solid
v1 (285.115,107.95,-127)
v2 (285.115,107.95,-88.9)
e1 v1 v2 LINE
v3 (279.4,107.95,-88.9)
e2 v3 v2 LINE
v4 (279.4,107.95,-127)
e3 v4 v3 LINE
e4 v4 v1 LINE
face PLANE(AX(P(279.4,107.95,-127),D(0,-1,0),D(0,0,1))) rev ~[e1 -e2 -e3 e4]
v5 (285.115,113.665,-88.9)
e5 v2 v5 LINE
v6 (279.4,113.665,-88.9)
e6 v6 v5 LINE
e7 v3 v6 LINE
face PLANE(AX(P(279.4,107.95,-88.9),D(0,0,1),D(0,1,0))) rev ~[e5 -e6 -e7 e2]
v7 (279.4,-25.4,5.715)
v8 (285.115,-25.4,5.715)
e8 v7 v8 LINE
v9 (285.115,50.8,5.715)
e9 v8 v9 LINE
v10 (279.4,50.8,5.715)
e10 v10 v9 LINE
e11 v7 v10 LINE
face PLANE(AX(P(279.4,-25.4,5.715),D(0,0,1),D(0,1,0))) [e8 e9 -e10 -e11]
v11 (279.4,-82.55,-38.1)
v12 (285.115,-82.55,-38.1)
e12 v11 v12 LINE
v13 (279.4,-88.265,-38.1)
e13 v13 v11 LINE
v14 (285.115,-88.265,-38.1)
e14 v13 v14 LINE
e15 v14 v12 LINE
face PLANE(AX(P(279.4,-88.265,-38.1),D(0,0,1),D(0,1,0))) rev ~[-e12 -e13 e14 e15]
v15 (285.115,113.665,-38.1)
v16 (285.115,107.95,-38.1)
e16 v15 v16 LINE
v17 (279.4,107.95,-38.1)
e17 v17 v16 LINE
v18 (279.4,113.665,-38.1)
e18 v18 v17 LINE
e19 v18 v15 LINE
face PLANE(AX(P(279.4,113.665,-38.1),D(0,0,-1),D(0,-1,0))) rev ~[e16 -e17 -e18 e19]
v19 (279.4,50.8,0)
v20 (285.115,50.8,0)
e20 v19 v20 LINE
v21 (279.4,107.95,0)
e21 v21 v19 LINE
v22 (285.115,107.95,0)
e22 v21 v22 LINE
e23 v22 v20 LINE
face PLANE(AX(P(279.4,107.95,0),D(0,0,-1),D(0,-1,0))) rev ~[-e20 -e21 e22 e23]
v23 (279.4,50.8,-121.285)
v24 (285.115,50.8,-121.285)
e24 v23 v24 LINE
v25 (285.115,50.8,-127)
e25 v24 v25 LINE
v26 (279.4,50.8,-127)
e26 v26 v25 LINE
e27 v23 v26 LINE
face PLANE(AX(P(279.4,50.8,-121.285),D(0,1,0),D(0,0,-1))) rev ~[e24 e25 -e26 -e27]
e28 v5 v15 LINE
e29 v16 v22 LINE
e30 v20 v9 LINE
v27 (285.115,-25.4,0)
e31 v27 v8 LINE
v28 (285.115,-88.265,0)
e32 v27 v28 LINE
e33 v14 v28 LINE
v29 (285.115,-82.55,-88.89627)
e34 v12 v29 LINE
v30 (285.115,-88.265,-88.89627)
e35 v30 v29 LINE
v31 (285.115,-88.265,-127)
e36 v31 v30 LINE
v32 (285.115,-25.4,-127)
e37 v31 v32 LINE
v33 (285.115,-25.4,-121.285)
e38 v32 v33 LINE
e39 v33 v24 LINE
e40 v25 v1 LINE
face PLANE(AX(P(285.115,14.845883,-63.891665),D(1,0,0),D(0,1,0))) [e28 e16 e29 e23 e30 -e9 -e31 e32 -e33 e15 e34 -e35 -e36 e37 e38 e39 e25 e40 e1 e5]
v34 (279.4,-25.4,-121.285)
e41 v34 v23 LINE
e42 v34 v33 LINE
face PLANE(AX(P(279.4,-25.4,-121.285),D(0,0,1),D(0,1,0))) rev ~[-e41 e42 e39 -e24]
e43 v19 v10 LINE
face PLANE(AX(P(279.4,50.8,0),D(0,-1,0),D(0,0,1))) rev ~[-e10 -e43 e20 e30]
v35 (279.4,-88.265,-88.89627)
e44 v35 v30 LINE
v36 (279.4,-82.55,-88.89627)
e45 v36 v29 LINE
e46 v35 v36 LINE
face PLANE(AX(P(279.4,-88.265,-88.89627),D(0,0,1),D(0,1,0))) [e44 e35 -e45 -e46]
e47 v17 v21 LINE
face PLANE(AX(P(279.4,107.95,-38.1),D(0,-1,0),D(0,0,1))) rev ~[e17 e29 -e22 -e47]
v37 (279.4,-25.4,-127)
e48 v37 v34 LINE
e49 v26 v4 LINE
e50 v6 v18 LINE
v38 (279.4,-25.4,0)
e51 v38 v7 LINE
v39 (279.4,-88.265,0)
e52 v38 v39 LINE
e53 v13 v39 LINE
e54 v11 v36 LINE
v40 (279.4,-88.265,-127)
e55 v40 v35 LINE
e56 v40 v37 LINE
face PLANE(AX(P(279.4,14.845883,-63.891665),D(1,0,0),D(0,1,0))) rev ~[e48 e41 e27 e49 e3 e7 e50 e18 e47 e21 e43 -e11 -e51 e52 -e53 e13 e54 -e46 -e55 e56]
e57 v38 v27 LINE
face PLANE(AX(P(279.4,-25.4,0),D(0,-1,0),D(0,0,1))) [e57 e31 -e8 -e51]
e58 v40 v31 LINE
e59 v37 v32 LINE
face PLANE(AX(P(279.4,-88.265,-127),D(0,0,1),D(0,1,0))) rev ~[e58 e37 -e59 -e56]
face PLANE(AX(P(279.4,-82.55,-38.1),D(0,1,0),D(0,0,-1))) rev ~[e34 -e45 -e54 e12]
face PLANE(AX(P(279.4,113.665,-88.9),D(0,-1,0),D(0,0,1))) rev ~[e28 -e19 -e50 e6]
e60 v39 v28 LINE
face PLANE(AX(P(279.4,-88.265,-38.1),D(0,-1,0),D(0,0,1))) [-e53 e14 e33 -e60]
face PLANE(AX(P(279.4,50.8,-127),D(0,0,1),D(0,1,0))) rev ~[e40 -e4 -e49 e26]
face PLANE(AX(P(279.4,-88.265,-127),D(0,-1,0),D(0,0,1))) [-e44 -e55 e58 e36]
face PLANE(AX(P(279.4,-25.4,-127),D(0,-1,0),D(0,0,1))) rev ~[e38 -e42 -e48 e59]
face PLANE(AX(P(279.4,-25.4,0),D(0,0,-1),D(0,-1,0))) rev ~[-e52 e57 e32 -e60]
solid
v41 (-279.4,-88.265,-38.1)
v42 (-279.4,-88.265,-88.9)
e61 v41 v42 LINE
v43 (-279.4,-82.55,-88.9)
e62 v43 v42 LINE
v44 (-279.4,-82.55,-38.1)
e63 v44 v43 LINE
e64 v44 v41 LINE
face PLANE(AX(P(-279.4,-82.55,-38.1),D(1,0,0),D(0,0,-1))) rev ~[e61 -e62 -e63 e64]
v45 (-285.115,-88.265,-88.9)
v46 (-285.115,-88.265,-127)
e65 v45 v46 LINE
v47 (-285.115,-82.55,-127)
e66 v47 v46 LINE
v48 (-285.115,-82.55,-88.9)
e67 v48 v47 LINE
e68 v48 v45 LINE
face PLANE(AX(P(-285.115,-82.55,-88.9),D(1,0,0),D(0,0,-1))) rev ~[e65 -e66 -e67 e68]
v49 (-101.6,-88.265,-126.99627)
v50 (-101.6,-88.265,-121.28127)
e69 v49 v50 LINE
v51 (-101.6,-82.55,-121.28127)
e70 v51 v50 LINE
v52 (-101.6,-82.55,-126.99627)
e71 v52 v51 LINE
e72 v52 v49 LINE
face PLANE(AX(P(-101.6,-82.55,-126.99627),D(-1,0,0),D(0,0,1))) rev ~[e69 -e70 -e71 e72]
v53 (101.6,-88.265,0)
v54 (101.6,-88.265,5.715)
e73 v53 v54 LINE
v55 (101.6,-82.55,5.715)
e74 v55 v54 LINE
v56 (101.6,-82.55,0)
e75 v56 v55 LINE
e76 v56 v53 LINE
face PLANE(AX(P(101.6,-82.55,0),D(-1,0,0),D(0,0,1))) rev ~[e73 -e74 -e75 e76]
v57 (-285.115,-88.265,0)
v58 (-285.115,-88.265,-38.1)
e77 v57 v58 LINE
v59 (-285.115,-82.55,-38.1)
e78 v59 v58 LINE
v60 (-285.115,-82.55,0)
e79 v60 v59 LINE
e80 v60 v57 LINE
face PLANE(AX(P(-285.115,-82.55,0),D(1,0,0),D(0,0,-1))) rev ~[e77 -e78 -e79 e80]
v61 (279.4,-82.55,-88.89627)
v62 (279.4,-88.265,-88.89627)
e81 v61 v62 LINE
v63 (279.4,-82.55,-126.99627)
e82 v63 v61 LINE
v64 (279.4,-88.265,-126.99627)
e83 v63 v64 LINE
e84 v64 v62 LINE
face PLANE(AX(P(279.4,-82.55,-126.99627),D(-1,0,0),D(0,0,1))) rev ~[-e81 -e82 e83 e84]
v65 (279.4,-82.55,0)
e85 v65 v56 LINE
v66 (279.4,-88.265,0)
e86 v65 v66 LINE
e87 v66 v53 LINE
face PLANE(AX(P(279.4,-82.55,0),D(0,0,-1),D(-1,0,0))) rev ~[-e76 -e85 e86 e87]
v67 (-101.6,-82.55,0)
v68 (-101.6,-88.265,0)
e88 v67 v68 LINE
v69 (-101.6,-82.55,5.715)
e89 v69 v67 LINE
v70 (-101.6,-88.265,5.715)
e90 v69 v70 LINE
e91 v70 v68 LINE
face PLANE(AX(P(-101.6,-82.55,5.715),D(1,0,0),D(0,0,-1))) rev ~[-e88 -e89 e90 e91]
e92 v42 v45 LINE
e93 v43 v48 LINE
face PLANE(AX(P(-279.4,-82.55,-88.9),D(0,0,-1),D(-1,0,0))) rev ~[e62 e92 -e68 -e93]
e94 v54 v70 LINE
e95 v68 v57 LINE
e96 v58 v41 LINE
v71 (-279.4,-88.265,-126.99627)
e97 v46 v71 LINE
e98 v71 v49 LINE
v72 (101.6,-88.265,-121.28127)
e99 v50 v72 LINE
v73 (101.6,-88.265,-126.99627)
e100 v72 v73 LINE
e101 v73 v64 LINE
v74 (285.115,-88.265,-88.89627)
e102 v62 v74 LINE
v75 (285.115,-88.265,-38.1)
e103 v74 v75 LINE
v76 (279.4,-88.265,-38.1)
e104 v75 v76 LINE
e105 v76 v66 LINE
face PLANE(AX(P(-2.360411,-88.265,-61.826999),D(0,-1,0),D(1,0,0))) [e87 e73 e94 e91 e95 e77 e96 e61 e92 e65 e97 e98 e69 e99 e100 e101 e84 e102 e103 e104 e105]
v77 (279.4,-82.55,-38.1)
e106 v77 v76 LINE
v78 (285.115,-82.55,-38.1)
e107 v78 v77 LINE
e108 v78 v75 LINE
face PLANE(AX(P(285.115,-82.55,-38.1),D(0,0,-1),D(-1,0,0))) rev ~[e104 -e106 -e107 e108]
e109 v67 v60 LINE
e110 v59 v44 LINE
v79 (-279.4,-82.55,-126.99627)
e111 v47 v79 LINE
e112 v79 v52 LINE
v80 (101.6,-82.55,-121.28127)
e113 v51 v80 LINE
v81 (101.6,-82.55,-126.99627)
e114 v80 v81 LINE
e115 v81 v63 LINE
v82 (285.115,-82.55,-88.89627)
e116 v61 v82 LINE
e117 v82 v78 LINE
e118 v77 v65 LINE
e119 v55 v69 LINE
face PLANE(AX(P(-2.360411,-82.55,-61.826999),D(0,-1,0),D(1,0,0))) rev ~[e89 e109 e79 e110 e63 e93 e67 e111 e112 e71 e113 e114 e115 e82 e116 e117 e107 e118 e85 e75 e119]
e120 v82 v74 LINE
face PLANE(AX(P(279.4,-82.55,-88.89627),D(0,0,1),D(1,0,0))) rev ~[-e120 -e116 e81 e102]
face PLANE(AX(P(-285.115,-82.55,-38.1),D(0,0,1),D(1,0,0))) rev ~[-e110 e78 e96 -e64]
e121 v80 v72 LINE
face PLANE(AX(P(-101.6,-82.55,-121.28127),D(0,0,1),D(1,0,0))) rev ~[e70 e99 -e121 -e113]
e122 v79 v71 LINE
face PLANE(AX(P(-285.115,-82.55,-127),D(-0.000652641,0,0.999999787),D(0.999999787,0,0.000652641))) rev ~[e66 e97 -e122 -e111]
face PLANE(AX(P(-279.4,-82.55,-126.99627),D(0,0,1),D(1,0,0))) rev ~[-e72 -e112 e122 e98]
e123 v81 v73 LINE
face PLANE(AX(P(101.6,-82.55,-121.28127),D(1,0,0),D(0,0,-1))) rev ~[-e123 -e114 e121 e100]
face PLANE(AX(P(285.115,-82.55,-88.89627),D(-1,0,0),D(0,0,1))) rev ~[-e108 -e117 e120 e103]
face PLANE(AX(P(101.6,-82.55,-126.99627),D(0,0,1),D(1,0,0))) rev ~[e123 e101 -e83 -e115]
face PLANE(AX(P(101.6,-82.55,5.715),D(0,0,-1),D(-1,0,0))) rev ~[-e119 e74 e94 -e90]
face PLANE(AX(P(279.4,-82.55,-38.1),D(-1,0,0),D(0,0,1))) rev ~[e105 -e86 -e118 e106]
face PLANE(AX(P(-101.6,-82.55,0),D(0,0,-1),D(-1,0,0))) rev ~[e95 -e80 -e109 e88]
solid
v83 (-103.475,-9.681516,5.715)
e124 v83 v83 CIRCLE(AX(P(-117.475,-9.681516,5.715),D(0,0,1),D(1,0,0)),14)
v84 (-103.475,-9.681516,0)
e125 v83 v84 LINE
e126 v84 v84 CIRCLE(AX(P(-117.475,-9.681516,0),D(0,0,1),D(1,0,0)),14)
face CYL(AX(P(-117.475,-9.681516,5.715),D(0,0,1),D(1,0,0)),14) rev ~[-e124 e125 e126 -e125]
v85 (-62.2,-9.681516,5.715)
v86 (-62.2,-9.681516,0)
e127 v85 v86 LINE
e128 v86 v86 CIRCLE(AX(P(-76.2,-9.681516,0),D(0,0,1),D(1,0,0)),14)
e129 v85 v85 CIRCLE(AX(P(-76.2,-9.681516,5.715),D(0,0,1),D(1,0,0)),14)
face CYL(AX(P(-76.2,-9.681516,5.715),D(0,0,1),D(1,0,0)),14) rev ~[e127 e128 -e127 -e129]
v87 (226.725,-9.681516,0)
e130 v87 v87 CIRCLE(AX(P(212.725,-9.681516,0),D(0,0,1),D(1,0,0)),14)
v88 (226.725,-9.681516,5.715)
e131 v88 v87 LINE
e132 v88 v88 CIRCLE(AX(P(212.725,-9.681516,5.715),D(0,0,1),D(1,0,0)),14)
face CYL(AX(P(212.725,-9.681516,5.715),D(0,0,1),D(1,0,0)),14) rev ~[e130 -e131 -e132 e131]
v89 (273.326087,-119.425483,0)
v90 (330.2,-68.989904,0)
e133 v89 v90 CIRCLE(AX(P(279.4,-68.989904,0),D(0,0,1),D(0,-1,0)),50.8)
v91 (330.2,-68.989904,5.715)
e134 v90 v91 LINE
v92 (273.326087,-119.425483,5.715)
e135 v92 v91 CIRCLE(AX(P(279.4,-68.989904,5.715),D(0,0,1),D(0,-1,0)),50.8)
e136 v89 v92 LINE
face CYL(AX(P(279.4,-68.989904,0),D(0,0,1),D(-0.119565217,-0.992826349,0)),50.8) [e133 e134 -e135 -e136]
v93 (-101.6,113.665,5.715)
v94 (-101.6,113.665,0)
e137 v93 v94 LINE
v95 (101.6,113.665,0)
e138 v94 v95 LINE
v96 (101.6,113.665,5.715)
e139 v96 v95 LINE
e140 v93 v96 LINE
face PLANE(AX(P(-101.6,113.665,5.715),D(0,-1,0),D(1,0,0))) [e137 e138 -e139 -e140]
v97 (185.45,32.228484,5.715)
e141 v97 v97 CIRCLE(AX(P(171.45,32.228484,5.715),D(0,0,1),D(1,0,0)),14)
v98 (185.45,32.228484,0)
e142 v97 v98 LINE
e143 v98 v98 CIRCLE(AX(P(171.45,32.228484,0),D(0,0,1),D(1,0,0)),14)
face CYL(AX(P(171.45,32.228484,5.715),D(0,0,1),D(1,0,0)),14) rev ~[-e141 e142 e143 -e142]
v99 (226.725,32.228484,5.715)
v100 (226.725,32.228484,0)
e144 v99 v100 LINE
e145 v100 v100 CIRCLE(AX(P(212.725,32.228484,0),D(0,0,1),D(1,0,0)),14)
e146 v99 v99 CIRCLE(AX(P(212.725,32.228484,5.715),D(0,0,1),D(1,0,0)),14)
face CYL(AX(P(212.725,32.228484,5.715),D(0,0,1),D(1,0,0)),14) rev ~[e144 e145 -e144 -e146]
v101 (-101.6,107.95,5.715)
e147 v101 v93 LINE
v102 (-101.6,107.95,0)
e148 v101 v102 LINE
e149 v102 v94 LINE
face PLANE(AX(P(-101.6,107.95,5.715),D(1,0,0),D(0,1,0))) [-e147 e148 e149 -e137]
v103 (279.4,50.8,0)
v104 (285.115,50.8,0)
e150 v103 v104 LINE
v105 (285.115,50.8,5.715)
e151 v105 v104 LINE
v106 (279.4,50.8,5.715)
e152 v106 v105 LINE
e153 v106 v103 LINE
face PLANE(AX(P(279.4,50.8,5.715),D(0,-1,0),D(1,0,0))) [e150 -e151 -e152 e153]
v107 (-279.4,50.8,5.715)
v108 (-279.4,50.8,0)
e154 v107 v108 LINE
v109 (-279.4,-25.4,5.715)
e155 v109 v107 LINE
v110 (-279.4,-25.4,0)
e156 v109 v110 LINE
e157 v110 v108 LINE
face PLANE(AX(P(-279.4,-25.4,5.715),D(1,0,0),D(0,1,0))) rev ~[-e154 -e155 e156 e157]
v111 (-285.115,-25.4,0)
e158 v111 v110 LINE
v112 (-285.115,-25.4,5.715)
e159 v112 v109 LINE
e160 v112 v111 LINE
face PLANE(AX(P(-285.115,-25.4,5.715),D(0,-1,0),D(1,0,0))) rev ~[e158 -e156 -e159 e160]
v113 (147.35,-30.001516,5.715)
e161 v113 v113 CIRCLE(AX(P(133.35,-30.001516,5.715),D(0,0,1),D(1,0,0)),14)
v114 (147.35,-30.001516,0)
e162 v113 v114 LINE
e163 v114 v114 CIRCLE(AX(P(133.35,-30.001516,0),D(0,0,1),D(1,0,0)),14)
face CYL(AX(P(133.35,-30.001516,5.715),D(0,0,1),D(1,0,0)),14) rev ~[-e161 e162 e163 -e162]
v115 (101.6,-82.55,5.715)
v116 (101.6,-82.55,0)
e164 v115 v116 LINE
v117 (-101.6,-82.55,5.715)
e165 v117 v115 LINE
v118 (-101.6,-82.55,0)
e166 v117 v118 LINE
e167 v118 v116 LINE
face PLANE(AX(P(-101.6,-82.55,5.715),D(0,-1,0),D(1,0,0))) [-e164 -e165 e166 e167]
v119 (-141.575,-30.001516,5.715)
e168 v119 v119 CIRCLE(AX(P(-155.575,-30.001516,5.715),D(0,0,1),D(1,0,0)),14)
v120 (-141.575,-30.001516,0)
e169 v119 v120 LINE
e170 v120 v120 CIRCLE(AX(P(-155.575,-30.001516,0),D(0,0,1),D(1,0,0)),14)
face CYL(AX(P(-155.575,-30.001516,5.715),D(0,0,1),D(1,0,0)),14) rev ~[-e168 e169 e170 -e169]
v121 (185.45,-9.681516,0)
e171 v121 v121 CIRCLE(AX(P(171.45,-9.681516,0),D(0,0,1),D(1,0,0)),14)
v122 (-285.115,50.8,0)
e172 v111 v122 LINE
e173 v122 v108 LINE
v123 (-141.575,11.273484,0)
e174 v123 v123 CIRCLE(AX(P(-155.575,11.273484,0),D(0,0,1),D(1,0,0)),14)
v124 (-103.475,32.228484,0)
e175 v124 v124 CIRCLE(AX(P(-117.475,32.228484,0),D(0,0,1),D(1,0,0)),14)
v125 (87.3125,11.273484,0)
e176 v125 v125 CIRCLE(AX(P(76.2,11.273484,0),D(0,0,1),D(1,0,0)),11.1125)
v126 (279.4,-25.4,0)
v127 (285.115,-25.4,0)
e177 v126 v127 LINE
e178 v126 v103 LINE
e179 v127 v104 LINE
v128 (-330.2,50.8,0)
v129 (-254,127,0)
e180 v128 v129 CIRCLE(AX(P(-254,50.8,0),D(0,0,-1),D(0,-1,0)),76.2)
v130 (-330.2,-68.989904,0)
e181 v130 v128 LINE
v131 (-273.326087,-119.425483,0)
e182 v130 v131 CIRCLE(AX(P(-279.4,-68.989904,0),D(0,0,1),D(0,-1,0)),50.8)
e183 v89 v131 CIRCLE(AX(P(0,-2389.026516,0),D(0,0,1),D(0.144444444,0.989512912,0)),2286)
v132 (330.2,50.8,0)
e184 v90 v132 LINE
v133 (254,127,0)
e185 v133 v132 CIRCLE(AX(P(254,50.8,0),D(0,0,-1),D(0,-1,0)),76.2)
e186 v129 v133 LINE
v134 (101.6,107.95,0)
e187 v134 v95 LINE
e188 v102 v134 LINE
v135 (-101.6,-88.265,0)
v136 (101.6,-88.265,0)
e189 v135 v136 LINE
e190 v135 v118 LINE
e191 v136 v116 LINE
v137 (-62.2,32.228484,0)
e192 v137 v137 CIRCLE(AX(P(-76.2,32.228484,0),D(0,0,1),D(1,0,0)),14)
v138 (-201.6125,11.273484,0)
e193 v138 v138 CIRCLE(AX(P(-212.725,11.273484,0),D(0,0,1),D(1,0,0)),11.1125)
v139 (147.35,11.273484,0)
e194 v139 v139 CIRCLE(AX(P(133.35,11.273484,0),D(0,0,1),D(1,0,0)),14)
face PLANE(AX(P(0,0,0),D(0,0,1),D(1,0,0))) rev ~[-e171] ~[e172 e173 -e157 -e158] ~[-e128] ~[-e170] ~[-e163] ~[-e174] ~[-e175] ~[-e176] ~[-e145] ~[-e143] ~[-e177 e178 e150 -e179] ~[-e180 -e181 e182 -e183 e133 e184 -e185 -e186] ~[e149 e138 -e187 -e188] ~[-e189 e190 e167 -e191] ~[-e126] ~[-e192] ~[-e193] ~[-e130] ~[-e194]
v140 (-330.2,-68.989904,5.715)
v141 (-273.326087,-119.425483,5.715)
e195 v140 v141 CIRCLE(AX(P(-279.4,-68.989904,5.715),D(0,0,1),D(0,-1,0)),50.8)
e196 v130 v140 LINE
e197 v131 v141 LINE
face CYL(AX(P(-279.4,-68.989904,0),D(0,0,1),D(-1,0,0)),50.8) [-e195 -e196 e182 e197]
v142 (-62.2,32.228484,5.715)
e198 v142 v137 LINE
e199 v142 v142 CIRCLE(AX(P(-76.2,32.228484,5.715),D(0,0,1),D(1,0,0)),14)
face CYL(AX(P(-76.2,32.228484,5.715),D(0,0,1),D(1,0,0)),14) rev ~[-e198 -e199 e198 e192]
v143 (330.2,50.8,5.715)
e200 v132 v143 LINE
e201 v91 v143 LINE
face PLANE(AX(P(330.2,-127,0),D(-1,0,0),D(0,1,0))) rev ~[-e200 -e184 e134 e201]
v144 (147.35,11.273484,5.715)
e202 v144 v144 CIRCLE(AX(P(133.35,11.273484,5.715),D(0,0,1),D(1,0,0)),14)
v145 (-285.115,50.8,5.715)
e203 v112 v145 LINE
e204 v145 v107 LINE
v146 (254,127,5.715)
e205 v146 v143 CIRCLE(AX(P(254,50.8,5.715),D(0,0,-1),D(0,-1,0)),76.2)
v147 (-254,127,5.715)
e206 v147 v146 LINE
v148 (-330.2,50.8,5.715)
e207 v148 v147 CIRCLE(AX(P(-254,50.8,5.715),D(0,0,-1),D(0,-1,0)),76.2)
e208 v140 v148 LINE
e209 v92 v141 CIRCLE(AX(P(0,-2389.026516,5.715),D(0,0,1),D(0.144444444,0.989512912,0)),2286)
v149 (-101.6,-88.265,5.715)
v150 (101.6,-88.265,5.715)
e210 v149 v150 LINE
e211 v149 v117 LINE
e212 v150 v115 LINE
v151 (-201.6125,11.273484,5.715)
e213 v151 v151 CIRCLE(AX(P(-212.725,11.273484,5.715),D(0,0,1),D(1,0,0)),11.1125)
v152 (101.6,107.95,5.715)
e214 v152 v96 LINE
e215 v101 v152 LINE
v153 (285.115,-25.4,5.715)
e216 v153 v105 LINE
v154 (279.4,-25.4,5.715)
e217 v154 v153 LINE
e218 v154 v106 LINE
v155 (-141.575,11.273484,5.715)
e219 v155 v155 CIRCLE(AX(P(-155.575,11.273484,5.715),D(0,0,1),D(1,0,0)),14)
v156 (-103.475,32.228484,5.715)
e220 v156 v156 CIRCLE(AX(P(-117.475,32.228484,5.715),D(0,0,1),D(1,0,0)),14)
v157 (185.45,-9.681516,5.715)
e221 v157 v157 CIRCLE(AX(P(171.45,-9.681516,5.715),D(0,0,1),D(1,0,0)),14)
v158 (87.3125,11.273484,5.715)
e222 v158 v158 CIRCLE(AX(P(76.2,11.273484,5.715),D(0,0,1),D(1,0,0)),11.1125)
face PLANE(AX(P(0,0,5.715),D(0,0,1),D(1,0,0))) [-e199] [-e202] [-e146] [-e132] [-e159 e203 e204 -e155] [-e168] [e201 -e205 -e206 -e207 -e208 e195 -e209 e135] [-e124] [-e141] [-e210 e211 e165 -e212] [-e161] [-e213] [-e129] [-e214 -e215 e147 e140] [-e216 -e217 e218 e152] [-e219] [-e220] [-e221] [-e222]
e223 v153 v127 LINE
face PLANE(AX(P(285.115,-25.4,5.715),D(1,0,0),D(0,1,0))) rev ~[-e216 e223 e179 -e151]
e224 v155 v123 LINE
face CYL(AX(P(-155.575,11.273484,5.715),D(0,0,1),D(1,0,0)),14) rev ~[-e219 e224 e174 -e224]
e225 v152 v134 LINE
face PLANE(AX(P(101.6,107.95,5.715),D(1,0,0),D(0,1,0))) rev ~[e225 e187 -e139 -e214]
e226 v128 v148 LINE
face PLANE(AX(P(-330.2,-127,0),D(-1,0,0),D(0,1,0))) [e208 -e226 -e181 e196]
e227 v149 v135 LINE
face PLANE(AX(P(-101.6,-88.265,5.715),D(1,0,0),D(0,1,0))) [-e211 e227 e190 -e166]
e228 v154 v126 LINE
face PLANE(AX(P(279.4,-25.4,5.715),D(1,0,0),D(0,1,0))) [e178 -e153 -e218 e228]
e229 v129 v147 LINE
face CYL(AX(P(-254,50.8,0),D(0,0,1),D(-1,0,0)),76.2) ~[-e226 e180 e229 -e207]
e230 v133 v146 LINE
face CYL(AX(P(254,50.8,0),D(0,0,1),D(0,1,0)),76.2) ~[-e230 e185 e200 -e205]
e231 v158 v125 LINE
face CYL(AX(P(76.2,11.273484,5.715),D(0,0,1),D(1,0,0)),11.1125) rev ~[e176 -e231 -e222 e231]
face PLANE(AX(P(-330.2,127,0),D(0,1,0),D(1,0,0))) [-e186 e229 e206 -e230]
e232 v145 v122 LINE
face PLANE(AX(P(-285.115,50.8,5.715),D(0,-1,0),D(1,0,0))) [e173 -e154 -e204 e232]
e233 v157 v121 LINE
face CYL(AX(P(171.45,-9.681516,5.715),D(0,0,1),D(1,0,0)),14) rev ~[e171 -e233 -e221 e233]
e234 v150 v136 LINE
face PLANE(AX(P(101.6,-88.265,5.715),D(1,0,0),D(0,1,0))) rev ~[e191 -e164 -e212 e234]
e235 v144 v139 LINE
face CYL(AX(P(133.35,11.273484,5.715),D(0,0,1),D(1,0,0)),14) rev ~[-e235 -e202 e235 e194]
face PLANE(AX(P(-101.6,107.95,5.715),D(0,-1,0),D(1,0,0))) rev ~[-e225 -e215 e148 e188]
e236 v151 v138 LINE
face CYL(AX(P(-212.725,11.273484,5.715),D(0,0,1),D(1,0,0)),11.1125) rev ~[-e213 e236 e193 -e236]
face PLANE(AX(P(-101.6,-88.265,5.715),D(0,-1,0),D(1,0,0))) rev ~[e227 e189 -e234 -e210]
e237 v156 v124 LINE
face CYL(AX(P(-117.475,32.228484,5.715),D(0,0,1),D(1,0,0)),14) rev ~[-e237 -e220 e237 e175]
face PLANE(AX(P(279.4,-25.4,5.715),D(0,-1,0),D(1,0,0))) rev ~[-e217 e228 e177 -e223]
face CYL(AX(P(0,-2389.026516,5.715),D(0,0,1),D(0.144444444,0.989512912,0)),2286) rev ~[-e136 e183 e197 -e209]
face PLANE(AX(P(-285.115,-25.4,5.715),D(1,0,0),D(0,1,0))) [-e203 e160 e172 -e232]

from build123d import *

# Parameters (mm, degrees)
F0_W      = 660.4
F0_H      = 254
F1_DEPTH  = 5.715
F3_DEPTH  = 5.716
F5_R      = 50.8
F6_R      = 11.1125
F6_R_2    = 14
F7_DEPTH  = 5.716
F8_R      = 76.2
F12_DEPTH = 5.715
F14_W     = 5.715
F14_H     = 38.1037298436
F14_W_2   = 76.2
F14_H_2   = 5.715
F14_H_3   = 38.1
F15_DEPTH = 5.715
F16_W     = 203.2
F16_H     = 5.715
F16_W_2   = 5.715
F16_H_2   = 76.2
F17_DEPTH = 25.4


with BuildPart() as f1:
    # F0 (on Top) → F1 (new body)
    with BuildSketch(Plane.XY):
        Rectangle(F0_W, F0_H)
    extrude(amount=F1_DEPTH)

    # F2 (on face) → F3 (cut, through all)
    with BuildSketch(Plane.XY.offset(5.715)):
        with BuildLine():
            Line((-330.2, -127), (330.2, -127))
            ThreePointArc((330.2, -127), (0, -103.0265162018), (-330.2, -127))
        make_face()
    extrude(amount=-F3_DEPTH, mode=Mode.SUBTRACT)

    # F5
    f5_edges = [f1.edges().sort_by_distance(p)[0] for p in [
        (-330.2, -127, 2.8575),
        (330.2, -127, 2.8575),
    ]]
    fillet(f5_edges, radius=F5_R)

    # F6 (on face) → F7 (cut, through all)
    with BuildSketch(Plane.XY.offset(5.715)):
        with Locations((-212.725, 11.2734837982)):
            Circle(F6_R)
        with Locations((76.2, 11.2734837982)):
            Circle(F6_R)
        with Locations((-117.475, 32.2284837982)):
            Circle(F6_R_2)
        with Locations((-117.475, -9.6815162018)):
            Circle(F6_R_2)
        with Locations((-155.575, 11.2734837982)):
            Circle(F6_R_2)
        with Locations((-155.575, -30.0015162018)):
            Circle(F6_R_2)
        with Locations((-76.2, -9.6815162018)):
            Circle(F6_R_2)
        with Locations((-76.2, 32.2284837982)):
            Circle(F6_R_2)
        with Locations((171.45, 32.2284837982)):
            Circle(F6_R_2)
        with Locations((212.725, 32.2284837982)):
            Circle(F6_R_2)
        with Locations((212.725, -9.6815162018)):
            Circle(F6_R_2)
        with Locations((171.45, -9.6815162018)):
            Circle(F6_R_2)
        with Locations((133.35, 11.2734837982)):
            Circle(F6_R_2)
        with Locations((133.35, -30.0015162018)):
            Circle(F6_R_2)
    extrude(amount=-F7_DEPTH, mode=Mode.SUBTRACT)

    # F8
    f8_edges = [f1.edges().sort_by_distance(p)[0] for p in [
        (-330.2, 127, 2.8575),
        (330.2, 127, 2.8575),
    ]]
    fillet(f8_edges, radius=F8_R)

    # F16 (on face) → F17 (cut)
    with BuildSketch(Plane.XY.offset(5.715)):
        with Locations((0, -85.4075)):
            Rectangle(F16_W, F16_H)
        with Locations((0, 110.8075)):
            Rectangle(F16_W, F16_H)
        with Locations((282.2575, 12.7)):
            Rectangle(F16_W_2, F16_H_2)
        with Locations((-282.2575, 12.7)):
            Rectangle(F16_W_2, F16_H_2)
    extrude(amount=-F17_DEPTH, mode=Mode.SUBTRACT)


with BuildPart() as f12:
    # F11 (on offset) → F12 (new body)
    with BuildSketch(Plane.XZ.offset(82.55)):
        Polygon((-285.115, -127), (-279.4, -126.9962701564), (-101.6, -126.9962701564), (-101.6, -121.2812701564), (101.6, -121.2812701564), (101.6, -126.9962701564), (279.4, -126.9962701564), (279.4, -88.8962701564), (285.115, -88.8962701564), (285.115, -38.1), (279.4, -38.1), (279.4, 0), (101.6, 0), (101.6, 5.715), (-101.6, 5.715), (-101.6, 0), (-279.4, 0), (-285.115, 0), (-285.115, -38.1), (-279.4, -38.1), (-279.4, -88.9), (-285.115, -88.9), align=None)
    extrude(amount=F12_DEPTH)


with BuildPart() as f15:
    # F14 (on offset) → F15 (new body)
    with BuildSketch(Plane.YZ.offset(279.4)):
        Polygon((50.8, -127), (107.95, -127), (107.95, -88.9), (113.665, -88.9), (113.665, -38.1), (107.95, -38.1), (107.95, 0), (50.8, 0), (-25.4, 0), (-82.55, 0), (-82.55, -38.1), (-82.55, -88.8962701564), (-82.55, -127), (-25.4, -127), (-25.4, -121.285), (50.8, -121.285), align=None)
        with Locations((-85.4075, -107.9481350782)):
            Rectangle(F14_W, F14_H)
        with Locations((12.7, 2.8575)):
            Rectangle(F14_W_2, F14_H_2)
        with Locations((-85.4075, -19.05)):
            Rectangle(F14_W, F14_H_3)
    extrude(amount=F15_DEPTH)


solid = Compound([f1.part, f12.part, f15.part])
